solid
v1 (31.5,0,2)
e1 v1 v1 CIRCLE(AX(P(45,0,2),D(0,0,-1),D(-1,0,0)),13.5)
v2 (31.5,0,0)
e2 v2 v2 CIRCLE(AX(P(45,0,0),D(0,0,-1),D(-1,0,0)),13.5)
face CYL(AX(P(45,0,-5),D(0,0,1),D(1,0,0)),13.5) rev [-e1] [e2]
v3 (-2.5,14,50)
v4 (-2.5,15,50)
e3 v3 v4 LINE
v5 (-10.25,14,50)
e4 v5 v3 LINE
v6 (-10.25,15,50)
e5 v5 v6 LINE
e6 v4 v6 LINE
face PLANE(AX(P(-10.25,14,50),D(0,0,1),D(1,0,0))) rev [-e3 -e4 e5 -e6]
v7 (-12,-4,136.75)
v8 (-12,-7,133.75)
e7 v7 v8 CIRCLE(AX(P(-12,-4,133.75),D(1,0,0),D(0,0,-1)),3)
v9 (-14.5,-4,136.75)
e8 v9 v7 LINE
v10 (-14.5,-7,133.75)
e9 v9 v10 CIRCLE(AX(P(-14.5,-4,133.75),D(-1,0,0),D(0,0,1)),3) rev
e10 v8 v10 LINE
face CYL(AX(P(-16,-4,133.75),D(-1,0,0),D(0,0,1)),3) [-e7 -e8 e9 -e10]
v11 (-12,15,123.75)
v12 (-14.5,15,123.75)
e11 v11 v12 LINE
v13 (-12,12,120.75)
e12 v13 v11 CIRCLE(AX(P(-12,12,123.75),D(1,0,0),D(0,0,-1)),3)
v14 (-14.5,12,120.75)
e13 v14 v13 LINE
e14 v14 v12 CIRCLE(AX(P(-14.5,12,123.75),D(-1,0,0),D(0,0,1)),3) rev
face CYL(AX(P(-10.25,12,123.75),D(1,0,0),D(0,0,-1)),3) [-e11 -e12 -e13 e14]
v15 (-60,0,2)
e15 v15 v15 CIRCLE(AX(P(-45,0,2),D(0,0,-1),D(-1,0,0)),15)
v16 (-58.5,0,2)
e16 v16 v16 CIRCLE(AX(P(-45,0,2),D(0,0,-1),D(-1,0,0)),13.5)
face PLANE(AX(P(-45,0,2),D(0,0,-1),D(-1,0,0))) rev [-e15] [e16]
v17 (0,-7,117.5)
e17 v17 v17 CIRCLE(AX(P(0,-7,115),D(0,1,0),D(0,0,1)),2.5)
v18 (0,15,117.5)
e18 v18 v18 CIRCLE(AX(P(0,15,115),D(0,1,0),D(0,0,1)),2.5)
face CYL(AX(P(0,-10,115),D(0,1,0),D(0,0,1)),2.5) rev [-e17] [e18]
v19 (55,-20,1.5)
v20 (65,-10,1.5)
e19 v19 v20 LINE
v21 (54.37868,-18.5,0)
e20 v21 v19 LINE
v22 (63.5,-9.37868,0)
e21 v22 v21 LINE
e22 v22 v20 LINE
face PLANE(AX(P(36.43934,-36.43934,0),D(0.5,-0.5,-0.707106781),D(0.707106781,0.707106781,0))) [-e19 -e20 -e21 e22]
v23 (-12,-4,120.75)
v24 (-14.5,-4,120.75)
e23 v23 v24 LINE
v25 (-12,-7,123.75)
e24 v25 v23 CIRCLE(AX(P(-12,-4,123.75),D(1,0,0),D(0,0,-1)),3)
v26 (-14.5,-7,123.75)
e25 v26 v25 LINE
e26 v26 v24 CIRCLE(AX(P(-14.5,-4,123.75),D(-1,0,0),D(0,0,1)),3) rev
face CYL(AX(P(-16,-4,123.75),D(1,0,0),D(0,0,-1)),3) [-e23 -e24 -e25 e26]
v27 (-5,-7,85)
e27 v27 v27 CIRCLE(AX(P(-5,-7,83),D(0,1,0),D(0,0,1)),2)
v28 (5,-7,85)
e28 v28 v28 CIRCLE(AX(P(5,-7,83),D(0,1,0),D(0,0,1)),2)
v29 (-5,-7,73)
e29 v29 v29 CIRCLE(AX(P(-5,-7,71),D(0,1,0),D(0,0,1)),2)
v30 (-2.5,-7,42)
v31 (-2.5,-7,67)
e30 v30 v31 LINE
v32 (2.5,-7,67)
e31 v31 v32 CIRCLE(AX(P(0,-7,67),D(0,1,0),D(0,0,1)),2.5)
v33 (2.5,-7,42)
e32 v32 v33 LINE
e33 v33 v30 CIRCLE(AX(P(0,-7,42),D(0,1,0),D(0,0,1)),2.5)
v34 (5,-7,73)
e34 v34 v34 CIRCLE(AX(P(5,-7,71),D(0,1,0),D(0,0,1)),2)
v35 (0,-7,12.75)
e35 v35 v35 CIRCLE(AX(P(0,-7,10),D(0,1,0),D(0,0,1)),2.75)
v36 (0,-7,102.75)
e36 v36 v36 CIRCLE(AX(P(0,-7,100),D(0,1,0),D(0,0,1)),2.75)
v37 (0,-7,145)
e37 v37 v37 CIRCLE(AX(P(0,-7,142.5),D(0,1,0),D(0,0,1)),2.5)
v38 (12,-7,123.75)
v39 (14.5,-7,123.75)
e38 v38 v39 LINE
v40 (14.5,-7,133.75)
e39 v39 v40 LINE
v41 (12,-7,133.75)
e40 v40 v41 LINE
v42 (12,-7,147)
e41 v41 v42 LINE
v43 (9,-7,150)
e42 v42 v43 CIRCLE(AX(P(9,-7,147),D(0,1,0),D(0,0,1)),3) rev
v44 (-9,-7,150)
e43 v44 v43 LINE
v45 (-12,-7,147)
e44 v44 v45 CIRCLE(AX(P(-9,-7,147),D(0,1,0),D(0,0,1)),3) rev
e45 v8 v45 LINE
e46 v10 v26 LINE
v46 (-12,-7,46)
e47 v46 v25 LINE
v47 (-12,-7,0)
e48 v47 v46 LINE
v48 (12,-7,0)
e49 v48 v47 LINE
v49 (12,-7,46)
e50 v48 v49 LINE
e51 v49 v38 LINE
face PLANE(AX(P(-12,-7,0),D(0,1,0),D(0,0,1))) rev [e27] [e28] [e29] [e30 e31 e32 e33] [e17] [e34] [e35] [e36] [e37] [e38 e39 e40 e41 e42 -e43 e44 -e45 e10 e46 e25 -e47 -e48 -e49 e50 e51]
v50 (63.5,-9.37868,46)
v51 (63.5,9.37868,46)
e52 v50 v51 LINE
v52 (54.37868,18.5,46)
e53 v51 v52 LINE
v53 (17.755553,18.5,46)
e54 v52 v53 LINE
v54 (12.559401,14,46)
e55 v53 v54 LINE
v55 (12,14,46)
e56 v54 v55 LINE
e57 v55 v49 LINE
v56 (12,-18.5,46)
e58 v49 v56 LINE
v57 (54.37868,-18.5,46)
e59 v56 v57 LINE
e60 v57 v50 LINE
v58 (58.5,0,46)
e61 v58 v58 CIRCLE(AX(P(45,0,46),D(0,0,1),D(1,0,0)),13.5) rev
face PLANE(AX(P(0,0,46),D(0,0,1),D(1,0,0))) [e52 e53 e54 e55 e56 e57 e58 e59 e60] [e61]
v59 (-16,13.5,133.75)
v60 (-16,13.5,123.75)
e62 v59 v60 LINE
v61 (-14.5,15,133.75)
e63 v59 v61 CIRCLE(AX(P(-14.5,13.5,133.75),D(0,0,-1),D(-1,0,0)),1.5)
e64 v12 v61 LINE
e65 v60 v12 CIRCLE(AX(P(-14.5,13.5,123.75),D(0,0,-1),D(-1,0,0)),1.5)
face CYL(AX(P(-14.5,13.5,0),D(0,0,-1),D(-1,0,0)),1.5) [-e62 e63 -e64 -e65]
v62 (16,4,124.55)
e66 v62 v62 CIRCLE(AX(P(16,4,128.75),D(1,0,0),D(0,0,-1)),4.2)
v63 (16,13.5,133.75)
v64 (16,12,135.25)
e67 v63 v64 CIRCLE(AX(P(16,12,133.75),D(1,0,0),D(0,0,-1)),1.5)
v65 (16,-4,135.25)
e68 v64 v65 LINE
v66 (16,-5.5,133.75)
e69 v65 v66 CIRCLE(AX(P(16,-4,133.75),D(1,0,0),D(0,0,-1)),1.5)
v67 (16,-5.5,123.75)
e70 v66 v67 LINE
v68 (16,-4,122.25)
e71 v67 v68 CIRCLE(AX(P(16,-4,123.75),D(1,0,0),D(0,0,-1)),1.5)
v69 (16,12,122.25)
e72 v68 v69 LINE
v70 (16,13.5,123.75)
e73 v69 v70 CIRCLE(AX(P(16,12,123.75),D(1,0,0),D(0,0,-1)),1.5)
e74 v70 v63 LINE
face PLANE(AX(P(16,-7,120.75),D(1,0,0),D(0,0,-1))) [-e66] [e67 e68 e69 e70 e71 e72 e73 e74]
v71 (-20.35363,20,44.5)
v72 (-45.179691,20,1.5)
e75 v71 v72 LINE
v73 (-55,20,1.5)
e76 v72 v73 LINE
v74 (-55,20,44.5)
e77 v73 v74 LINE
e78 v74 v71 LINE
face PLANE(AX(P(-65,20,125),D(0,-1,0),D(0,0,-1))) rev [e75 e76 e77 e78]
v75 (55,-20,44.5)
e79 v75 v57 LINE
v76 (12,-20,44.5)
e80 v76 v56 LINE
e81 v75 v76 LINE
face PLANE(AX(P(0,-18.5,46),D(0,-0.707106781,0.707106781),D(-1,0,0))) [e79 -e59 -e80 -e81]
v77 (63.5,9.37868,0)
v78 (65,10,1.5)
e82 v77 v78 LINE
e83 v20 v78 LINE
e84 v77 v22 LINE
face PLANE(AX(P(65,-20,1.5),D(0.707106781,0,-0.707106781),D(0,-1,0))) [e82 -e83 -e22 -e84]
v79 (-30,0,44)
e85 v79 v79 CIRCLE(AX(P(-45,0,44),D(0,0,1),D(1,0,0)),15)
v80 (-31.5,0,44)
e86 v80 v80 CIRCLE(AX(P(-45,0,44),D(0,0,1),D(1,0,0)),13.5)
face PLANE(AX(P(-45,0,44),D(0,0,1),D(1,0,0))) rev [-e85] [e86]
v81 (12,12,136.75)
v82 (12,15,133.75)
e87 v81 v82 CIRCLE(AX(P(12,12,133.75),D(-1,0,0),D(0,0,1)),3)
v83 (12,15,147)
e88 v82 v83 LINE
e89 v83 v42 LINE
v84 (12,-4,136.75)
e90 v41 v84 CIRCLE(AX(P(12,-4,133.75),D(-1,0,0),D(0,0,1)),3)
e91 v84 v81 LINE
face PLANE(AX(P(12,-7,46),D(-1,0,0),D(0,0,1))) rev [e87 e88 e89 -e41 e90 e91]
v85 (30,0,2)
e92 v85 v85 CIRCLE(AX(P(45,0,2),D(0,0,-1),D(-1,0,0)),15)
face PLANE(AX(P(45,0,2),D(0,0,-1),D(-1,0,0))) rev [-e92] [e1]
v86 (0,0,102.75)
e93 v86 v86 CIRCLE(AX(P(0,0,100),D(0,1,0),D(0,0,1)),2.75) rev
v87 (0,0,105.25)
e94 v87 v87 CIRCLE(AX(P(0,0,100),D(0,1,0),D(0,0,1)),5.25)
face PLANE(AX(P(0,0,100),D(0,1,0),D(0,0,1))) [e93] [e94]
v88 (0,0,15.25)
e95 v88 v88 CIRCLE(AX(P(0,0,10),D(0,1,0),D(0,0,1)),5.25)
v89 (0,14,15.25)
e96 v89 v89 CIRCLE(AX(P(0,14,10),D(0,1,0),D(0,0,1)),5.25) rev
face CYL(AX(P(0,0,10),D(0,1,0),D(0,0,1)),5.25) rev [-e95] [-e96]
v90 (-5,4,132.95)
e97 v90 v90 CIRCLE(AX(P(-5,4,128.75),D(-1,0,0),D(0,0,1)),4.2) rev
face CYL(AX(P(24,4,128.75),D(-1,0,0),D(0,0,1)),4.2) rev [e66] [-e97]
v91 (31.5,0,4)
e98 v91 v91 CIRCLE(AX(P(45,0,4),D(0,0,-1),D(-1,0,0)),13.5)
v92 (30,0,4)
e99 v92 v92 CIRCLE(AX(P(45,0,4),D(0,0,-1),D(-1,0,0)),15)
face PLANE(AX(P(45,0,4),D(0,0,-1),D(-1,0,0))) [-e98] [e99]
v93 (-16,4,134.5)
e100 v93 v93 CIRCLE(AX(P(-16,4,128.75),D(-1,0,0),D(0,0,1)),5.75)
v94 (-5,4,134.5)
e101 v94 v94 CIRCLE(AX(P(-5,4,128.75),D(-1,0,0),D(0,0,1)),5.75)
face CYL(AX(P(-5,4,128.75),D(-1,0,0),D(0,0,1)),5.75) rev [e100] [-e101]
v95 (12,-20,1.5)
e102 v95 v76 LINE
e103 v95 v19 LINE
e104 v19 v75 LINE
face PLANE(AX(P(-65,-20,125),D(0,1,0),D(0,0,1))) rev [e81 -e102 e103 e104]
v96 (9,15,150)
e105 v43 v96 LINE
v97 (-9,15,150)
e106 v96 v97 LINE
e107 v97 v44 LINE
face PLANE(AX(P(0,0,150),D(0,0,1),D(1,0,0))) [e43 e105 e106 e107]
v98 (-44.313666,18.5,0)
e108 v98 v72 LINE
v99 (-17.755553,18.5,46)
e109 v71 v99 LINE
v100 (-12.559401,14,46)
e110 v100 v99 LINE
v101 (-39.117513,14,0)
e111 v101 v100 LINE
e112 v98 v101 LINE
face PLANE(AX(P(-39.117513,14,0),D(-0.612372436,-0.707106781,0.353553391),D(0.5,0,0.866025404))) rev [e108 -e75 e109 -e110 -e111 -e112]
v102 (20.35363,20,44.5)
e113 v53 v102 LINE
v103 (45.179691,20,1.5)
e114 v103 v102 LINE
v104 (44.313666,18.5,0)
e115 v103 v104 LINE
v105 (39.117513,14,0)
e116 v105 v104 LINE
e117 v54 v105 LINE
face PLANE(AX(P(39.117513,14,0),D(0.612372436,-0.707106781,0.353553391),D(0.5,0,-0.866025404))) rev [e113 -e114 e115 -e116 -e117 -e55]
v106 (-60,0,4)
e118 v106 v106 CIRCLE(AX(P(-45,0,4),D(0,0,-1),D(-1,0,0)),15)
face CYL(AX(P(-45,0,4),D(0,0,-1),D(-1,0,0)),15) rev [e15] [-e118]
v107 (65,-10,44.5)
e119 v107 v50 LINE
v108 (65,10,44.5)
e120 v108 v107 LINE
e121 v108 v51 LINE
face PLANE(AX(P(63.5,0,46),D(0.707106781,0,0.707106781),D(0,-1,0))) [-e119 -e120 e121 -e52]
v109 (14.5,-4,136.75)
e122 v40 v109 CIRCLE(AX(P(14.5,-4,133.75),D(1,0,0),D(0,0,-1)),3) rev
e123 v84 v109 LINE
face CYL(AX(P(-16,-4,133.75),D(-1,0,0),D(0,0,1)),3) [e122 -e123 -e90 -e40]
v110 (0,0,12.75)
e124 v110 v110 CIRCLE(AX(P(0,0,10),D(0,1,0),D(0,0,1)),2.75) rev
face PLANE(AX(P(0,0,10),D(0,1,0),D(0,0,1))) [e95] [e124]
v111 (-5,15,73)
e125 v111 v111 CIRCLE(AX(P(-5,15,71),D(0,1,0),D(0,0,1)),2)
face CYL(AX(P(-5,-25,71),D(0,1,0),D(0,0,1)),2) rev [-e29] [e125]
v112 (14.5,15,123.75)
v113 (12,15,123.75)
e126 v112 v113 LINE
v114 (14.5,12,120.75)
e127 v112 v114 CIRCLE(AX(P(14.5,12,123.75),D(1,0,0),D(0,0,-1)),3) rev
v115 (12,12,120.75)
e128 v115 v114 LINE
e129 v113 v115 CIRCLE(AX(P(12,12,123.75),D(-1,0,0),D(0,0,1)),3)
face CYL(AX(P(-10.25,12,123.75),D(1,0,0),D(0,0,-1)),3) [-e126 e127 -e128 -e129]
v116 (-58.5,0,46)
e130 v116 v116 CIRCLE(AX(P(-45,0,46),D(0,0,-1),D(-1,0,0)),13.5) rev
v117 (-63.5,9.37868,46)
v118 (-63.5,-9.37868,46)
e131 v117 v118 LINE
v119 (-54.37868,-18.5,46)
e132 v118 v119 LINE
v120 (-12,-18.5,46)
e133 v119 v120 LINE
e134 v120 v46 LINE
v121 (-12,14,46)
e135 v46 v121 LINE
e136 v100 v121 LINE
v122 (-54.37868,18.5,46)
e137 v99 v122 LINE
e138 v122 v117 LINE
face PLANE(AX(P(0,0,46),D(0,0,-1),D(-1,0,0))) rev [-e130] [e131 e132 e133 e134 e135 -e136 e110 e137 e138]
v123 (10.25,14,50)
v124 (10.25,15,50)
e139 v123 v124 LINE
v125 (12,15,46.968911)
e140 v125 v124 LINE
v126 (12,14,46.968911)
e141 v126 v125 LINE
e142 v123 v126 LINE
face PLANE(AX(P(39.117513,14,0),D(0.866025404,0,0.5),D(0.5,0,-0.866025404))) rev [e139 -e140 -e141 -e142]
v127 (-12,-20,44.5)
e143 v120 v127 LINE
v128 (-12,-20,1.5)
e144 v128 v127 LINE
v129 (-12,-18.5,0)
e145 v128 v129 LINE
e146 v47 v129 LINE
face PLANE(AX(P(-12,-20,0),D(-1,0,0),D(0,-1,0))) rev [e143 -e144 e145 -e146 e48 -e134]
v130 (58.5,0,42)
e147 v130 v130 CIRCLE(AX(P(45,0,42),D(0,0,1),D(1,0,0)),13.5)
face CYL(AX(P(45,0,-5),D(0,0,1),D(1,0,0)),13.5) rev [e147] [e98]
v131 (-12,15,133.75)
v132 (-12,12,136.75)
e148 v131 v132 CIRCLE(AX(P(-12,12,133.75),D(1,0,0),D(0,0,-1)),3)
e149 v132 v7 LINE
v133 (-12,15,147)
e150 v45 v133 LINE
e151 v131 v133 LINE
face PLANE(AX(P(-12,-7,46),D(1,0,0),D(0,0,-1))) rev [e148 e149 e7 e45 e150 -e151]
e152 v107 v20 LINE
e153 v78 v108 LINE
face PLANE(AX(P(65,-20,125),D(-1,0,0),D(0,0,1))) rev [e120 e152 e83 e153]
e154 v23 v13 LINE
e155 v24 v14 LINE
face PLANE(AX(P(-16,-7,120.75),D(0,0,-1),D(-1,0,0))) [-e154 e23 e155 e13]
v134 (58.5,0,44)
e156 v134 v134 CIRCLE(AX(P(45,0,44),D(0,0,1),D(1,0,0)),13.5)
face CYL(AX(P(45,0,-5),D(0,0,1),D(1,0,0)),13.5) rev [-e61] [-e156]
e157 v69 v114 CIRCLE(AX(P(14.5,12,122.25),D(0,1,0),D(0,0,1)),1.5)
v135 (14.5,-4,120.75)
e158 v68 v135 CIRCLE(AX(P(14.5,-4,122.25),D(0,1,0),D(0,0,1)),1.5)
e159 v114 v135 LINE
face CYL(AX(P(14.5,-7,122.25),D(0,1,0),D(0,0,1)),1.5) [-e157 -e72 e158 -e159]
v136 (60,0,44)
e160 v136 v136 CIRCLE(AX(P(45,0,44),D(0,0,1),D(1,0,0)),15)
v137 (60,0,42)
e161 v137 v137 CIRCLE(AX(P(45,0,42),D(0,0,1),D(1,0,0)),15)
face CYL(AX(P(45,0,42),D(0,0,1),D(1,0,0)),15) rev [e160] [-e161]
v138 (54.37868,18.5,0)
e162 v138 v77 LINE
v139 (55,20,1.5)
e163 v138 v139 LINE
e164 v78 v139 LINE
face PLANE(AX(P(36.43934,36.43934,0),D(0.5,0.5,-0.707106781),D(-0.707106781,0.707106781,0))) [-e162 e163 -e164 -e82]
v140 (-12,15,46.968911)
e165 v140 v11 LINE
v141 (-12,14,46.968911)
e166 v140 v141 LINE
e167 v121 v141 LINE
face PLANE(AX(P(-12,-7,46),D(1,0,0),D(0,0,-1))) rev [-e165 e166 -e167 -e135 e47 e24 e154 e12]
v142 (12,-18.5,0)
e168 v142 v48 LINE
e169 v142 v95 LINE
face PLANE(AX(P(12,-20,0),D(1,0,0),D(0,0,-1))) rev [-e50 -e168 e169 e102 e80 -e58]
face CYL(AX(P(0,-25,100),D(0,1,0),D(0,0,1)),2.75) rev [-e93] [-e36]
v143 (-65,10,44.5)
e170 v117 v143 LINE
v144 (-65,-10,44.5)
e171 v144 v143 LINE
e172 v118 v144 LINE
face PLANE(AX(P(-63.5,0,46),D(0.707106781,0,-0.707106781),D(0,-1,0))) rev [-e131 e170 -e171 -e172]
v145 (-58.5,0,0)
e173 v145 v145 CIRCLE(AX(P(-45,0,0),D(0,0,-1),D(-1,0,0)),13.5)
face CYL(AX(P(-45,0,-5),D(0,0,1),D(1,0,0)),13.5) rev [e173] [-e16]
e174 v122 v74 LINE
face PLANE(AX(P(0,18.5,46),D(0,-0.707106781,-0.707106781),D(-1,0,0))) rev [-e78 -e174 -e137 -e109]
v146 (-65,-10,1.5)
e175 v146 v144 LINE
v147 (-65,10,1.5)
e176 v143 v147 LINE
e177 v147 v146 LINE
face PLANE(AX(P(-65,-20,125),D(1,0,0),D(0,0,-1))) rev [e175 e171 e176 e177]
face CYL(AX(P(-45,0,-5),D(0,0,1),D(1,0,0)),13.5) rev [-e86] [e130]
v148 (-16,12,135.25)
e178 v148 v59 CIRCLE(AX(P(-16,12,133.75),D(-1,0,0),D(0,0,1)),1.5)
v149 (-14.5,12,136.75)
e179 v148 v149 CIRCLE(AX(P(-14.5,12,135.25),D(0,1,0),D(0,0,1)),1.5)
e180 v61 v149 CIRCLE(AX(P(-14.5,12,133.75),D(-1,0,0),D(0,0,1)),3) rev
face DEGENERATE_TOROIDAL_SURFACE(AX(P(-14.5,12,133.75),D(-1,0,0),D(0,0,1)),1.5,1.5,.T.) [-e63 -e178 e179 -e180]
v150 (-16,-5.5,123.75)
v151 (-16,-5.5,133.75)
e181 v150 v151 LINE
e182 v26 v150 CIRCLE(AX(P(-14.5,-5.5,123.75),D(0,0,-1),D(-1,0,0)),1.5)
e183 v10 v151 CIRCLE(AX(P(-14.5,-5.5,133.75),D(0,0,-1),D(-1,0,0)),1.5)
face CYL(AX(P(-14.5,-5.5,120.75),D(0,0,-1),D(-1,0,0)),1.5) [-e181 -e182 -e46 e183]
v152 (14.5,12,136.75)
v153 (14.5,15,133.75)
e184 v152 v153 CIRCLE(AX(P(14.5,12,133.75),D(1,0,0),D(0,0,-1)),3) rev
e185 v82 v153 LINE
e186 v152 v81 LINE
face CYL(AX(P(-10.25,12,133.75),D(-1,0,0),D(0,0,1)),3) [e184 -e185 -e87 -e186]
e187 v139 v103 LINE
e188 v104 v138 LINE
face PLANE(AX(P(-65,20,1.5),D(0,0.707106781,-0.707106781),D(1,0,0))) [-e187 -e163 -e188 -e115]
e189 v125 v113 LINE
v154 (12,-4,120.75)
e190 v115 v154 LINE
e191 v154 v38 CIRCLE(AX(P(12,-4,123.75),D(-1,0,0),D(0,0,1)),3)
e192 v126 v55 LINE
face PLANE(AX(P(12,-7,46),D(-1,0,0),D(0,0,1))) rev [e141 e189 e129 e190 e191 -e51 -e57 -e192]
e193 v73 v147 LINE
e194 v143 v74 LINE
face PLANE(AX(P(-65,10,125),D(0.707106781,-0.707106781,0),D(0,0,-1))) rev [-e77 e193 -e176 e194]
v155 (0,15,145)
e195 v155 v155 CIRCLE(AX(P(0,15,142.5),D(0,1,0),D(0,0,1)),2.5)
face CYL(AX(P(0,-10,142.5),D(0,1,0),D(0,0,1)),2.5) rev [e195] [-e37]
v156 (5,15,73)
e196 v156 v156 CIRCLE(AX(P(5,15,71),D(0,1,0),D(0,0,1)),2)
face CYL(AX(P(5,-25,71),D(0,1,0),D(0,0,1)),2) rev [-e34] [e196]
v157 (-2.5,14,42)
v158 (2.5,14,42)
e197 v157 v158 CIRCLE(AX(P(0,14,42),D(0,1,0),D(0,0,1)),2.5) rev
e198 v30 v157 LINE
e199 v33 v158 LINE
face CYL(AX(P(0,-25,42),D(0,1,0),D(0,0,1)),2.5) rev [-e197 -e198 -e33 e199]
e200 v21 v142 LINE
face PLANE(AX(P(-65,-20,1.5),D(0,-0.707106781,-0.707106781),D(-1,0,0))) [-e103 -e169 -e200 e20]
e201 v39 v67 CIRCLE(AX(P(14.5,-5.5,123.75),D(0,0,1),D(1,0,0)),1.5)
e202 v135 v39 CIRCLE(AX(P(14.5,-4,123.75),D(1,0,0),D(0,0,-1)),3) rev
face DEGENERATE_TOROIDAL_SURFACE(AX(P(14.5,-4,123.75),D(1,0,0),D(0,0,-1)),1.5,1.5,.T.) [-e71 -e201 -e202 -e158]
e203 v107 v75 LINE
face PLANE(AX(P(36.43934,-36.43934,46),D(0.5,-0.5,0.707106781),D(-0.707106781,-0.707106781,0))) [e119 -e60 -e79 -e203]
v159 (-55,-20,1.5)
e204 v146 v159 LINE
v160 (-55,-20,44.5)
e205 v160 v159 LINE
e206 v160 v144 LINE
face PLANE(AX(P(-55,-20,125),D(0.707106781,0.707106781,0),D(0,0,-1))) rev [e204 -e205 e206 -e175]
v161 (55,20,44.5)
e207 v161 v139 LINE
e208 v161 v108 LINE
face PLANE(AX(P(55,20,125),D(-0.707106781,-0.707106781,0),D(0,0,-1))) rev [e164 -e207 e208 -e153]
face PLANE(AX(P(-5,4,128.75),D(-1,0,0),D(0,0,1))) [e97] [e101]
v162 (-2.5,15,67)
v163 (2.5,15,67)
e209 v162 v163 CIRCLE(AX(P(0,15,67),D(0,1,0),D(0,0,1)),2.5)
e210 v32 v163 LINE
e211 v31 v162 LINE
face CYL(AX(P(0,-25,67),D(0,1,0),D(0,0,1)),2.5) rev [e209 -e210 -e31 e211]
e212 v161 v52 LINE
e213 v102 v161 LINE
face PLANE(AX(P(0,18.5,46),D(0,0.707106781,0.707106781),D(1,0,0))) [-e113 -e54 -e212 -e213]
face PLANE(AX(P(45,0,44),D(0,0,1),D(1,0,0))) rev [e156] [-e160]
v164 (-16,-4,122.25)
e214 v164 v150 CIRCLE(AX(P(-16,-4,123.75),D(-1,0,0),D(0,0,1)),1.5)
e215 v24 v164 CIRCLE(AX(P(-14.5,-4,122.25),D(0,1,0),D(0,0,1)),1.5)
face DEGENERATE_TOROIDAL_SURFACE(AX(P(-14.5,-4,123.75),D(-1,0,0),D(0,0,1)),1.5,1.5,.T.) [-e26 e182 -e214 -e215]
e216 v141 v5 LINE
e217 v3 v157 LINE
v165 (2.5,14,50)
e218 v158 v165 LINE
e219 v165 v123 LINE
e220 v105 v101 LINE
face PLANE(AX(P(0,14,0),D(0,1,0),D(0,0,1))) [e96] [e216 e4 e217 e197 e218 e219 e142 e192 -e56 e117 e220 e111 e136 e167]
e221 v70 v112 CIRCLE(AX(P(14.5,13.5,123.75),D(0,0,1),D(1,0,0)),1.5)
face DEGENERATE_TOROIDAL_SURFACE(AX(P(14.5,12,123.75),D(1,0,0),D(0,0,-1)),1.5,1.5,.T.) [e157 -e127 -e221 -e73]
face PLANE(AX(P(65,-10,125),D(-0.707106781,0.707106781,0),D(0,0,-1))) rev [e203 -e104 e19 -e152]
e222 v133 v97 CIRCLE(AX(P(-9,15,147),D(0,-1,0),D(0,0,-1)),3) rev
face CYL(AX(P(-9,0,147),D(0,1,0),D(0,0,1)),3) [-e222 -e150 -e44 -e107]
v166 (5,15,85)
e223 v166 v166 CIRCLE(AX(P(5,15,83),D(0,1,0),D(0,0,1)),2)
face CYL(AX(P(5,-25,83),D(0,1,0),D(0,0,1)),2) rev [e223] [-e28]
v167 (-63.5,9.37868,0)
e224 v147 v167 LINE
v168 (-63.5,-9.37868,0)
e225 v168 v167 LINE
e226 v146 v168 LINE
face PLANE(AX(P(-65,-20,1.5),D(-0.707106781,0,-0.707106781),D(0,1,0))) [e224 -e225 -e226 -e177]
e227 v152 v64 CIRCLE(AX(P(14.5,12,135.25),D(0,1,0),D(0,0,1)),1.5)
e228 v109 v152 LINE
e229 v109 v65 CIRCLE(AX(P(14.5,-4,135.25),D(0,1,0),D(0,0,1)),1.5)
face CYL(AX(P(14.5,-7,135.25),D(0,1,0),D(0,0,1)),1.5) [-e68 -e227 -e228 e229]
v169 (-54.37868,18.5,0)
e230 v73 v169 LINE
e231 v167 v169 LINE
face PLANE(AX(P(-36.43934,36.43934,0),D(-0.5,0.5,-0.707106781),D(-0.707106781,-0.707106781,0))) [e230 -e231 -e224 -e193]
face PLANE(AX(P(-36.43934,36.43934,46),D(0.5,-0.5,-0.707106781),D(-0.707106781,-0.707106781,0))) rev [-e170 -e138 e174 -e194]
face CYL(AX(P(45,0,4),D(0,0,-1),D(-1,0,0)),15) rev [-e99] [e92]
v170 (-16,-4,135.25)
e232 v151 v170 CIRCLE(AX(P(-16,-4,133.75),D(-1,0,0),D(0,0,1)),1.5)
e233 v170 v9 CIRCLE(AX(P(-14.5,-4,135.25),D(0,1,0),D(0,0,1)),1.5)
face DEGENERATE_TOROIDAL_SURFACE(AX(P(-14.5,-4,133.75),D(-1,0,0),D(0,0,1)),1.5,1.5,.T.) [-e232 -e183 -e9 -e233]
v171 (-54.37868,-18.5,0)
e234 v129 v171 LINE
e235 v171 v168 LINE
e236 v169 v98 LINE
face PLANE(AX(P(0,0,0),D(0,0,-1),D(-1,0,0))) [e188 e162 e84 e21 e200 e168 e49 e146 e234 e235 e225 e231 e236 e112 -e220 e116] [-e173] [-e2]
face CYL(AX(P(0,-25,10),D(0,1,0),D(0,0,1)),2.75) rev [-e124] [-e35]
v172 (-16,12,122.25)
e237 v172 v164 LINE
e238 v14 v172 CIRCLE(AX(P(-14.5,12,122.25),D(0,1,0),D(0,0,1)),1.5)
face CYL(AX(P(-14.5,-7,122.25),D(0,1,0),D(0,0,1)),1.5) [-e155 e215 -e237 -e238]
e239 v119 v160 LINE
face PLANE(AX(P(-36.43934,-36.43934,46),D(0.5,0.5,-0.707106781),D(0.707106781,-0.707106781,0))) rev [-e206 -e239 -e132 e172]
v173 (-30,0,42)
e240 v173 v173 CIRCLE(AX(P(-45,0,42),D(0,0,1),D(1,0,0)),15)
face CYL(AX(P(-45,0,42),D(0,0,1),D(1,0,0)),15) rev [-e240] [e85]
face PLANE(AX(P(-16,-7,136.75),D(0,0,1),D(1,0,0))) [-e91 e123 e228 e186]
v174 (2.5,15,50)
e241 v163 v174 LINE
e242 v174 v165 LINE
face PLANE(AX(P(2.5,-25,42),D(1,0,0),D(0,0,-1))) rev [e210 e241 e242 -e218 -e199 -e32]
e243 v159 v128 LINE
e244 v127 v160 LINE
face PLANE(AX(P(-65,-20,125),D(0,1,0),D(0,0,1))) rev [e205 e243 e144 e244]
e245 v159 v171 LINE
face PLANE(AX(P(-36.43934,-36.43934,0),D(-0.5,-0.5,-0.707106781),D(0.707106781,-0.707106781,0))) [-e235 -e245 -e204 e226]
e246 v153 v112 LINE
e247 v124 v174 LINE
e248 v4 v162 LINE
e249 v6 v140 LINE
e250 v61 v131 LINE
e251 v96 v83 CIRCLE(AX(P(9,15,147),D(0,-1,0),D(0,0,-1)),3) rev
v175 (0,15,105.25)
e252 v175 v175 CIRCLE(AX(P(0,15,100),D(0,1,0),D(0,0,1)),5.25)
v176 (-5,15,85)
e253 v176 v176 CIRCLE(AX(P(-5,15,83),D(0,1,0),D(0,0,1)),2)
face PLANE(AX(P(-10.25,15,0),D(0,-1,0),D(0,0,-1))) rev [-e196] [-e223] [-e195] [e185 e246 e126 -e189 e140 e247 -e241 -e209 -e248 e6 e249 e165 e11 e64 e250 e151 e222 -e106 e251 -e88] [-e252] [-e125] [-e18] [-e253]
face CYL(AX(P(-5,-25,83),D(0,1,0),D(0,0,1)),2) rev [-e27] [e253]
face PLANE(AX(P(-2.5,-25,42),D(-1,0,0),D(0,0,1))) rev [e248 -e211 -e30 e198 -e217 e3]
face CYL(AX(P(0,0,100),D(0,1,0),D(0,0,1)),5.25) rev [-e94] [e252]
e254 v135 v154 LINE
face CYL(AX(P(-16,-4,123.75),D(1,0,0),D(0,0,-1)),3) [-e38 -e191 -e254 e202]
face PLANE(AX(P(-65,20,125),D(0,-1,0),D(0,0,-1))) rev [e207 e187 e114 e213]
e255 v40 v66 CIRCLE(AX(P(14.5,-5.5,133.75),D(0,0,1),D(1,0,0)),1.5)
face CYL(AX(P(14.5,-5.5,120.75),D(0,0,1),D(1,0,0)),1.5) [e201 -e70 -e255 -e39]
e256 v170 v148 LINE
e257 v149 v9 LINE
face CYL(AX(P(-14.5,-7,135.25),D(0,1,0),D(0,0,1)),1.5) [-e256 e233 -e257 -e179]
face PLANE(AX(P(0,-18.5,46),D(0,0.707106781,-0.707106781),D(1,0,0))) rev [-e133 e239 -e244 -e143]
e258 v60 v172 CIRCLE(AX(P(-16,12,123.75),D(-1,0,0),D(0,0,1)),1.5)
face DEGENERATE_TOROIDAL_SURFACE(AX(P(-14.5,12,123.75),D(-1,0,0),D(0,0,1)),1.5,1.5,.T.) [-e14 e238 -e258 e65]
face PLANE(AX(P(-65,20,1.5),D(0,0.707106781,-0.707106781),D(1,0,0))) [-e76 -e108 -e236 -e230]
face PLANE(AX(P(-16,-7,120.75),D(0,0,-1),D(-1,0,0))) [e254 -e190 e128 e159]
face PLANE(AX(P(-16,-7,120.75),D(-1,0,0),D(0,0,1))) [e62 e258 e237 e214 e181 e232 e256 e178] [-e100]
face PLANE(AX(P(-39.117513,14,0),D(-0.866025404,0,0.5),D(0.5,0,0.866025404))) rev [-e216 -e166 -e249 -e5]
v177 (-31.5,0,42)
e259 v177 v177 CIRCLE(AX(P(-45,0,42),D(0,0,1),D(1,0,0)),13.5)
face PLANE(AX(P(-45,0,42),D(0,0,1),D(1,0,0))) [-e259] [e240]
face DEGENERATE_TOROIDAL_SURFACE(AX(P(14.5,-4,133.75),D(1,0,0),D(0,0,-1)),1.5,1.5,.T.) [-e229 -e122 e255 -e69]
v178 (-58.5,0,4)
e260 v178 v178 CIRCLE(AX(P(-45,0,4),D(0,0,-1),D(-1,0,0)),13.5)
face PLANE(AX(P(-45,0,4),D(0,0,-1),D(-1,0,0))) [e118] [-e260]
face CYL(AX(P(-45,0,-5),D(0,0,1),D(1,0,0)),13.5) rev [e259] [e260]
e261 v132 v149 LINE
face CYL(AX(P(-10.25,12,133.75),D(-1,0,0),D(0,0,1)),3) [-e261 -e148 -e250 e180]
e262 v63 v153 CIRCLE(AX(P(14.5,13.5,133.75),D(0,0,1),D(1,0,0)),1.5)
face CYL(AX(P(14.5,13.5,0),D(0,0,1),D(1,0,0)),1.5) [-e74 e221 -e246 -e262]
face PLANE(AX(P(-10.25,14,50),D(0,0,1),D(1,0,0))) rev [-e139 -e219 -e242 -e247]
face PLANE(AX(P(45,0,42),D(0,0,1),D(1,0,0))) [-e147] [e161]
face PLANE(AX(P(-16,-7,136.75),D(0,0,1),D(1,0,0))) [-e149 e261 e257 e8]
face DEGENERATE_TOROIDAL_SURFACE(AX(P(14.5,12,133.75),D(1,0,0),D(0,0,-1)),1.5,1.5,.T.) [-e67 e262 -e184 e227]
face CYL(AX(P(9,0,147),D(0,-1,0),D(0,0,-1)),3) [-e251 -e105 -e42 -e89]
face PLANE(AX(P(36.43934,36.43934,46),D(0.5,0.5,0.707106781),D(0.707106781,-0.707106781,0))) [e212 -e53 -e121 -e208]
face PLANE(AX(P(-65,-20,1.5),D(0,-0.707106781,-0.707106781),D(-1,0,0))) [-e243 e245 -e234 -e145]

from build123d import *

# Parameters (mm, degrees)
SKETCH1_W           = 130
SKETCH1_H           = 40
BOSS_EXTRUDE1_DEPTH = 125
SKETCH2_R           = 13.5
CUT_EXTRUDE1_DEPTH  = 130
SKETCH3_W           = 24
SKETCH3_H           = 13
CUT_EXTRUDE2_DEPTH  = 125
SKETCH4_W           = 20.5
SKETCH4_H           = 5
CUT_EXTRUDE3_DEPTH  = 125
SKETCH5_R           = 2.75
CUT_EXTRUDE4_DEPTH  = 40
SKETCH6_R           = 2
CUT_EXTRUDE5_DEPTH  = 40
SKETCH7_R           = 5.25
CUT_EXTRUDE6_DEPTH  = 15
CUT_EXTRUDE11_START = -4
SKETCH10_R          = 15
SKETCH10_R_2        = 13.5
CUT_EXTRUDE11_DEPTH = 2
CHAMFER1_SIZE       = 10
CUT_EXTRUDE13_DEPTH = 79
CUT_EXTRUDE14_START = -2
SKETCH13_R          = 15
SKETCH13_R_2        = 13.5
CUT_EXTRUDE14_DEPTH = 2
CUT_EXTRUDE16_DEPTH = 6
CHAMFER2_SIZE       = 6
CHAMFER3_SIZE       = 1.5
CHAMFER4_SIZE       = 1.5
SKETCH16_W          = 24
SKETCH16_H          = 22
BOSS_EXTRUDE2_DEPTH = 25
SKETCH17_R          = 2.5
CUT_EXTRUDE17_DEPTH = 25
FILLET2_R           = 3
SKETCH18_W          = 32
SKETCH18_H          = 16
BOSS_EXTRUDE3_DEPTH = 22
SKETCH19_R          = 4.2
CUT_EXTRUDE18_DEPTH = 40
FILLET3_R           = 3
FILLET4_R           = 1.5
SKETCH20_R          = 5.75
CUT_EXTRUDE19_DEPTH = 11


with BuildPart() as part:
    # Sketch1 → Boss-Extrude1 (new body)
    with BuildSketch(Plane.XY):
        Rectangle(SKETCH1_W, SKETCH1_H)
    extrude(amount=BOSS_EXTRUDE1_DEPTH)

    # Sketch2 → Cut-Extrude1 (cut)
    with BuildSketch(Plane.XY.offset(125)):
        with Locations((-45, 0)):
            Circle(SKETCH2_R)
        with Locations((45, 0)):
            Circle(SKETCH2_R)
    extrude(amount=-CUT_EXTRUDE1_DEPTH, mode=Mode.SUBTRACT)

    # Sketch3 → Cut-Extrude2 (cut)
    with BuildSketch(Plane.XY.offset(125)):
        with Locations((0, -13.5)):
            Rectangle(SKETCH3_W, SKETCH3_H)
    extrude(amount=-CUT_EXTRUDE2_DEPTH, mode=Mode.SUBTRACT)

    # Sketch4 → Cut-Extrude3 (cut)
    with BuildSketch(Plane.XY.offset(125)):
        with Locations((0, 17.5)):
            Rectangle(SKETCH4_W, SKETCH4_H)
    extrude(amount=-CUT_EXTRUDE3_DEPTH, mode=Mode.SUBTRACT)

    # Sketch5 → Cut-Extrude4 (cut)
    with BuildSketch(Plane(origin=(0, 15, 0), x_dir=(1, 0, 0), z_dir=(0, 1, 0))):
        with Locations(Location((0, -10, 0), (0, 0, 270))):
            Circle(SKETCH5_R)
        with Locations(Location((0, -100, 0), (0, 0, 270))):
            Circle(SKETCH5_R)
    extrude(amount=-CUT_EXTRUDE4_DEPTH, mode=Mode.SUBTRACT)

    # Sketch6 → Cut-Extrude5 (cut)
    with BuildSketch(Plane(origin=(0, 15, 0), x_dir=(1, 0, 0), z_dir=(0, 1, 0))):
        with Locations(Location((-5, -71, 0), (0, 0, 270))):
            Circle(SKETCH6_R)
        with Locations(Location((5, -71, 0), (0, 0, 270))):
            Circle(SKETCH6_R)
        with Locations(Location((5, -83, 0), (0, 0, 270))):
            Circle(SKETCH6_R)
        with Locations(Location((-5, -83, 0), (0, 0, 270))):
            Circle(SKETCH6_R)
        with BuildLine():
            Line((2.5, -42), (2.5, -67))
            ThreePointArc((2.5, -67), (0, -69.5), (-2.5, -67))
            Line((-2.5, -67), (-2.5, -42))
            ThreePointArc((-2.5, -42), (0, -39.5), (2.5, -42))
        make_face()
    extrude(amount=-CUT_EXTRUDE5_DEPTH, mode=Mode.SUBTRACT)

    # Sketch7 → Cut-Extrude6 (cut)
    with BuildSketch(Plane(origin=(0, 15, 0), x_dir=(1, 0, 0), z_dir=(0, 1, 0))):
        with Locations(Location((0, -100, 0), (0, 0, 270))):
            Circle(SKETCH7_R)
        with Locations(Location((0, -10, 0), (0, 0, 270))):
            Circle(SKETCH7_R)
    extrude(amount=-CUT_EXTRUDE6_DEPTH, mode=Mode.SUBTRACT)

    # Sketch10 → Cut-Extrude11 (cut)
    # profile 1 of 2: a face of its own
    with BuildSketch(Plane(origin=(0, 0, 0), x_dir=(-1, 0, 0), z_dir=(0, 0, -1)).offset(CUT_EXTRUDE11_START)):
        with Locations((-45, 0)):
            Circle(SKETCH10_R)
        with Locations(Location((-45, 0, 0), (0, 0, 180))):
            Circle(SKETCH10_R_2, mode=Mode.SUBTRACT)
    # profile 2 of 2: a face of its own
    with BuildSketch(Plane(origin=(0, 0, 0), x_dir=(-1, 0, 0), z_dir=(0, 0, -1)).offset(CUT_EXTRUDE11_START)):
        with Locations((45, 0)):
            Circle(SKETCH10_R)
        with Locations(Location((45, 0, 0), (0, 0, 180))):
            Circle(SKETCH10_R_2, mode=Mode.SUBTRACT)
    extrude(amount=CUT_EXTRUDE11_DEPTH, mode=Mode.SUBTRACT)

    # Chamfer1
    chamfer1_edges = [part.edges().sort_by_distance(p)[0] for p in [
        (65, -20, 62.5),
        (-65, -20, 62.5),
        (-65, 20, 62.5),
        (65, 20, 62.5),
    ]]
    chamfer(chamfer1_edges, length=CHAMFER1_SIZE)

    # Sketch12 → Cut-Extrude13 (cut)
    with BuildSketch(Plane.XY.offset(125)):
        Polygon((-12, -7), (-12, 15), (-10.25, 15), (-10.25, 20), (-55, 20), (-65, 10), (-65, -10), (-55, -20), (-12, -20), align=None)
        Polygon((12, -7), (12, 15), (10.25, 15), (10.25, 20), (55, 20), (65, 10), (65, -10), (55, -20), (12, -20), align=None)
    extrude(amount=-CUT_EXTRUDE13_DEPTH, mode=Mode.SUBTRACT)

    # Sketch13 → Cut-Extrude14 (cut)
    # profile 1 of 2: a face of its own
    with BuildSketch(Plane.XY.offset(46).offset(CUT_EXTRUDE14_START)):
        with Locations(Location((-45, 0, 0), (0, 0, 180))):
            Circle(SKETCH13_R)
        with Locations((-45, 0)):
            Circle(SKETCH13_R_2, mode=Mode.SUBTRACT)
    # profile 2 of 2: a face of its own
    with BuildSketch(Plane.XY.offset(46).offset(CUT_EXTRUDE14_START)):
        with Locations(Location((45, 0, 0), (0, 0, 180))):
            Circle(SKETCH13_R)
        with Locations((45, 0)):
            Circle(SKETCH13_R_2, mode=Mode.SUBTRACT)
    extrude(amount=-CUT_EXTRUDE14_DEPTH, mode=Mode.SUBTRACT)

    # Sketch14 → Cut-Extrude16 (cut)
    with BuildSketch(Plane(origin=(0, 20, 0), x_dir=(1, 0, 0), z_dir=(0, 1, 0))):
        Polygon((-10.25, -50), (10.25, -50), (39.117513459, 0), (10.25, 0), (-10.25, 0), (-39.117513459, 0), align=None)
    extrude(amount=-CUT_EXTRUDE16_DEPTH, mode=Mode.SUBTRACT)

    # Chamfer2
    chamfer2_edges = [part.edges().sort_by_distance(p)[0] for p in [
        (-25.838457268, 20, 23),
        (25.838457268, 20, 23),
    ]]
    chamfer(chamfer2_edges, length=CHAMFER2_SIZE - 0.0001)  # a hair under: the kernel refuses the full size

    # Chamfer3
    chamfer3_edges = [part.edges().sort_by_distance(p)[0] for p in [
        (-33.5, -20, 46),
        (-60, -15, 46),
        (-65, 0, 46),
        (-60, 15, 46),
        (37.243744418, 20, 46),
        (60, 15, 46),
        (65, 0, 46),
        (60, -15, 46),
        (33.5, -20, 46),
        (-37.243744418, 20, 46),
    ]]
    chamfer(chamfer3_edges, length=CHAMFER3_SIZE)

    # Chamfer4
    chamfer4_edges = [part.edges().sort_by_distance(p)[0] for p in [
        (65, 0, 0),
        (50.52280061, 20, 0),
        (-33.5, -20, 0),
        (-65, 0, 0),
        (-60, 15, 0),
        (-60, -15, 0),
        (60, 15, 0),
        (60, -15, 0),
        (33.5, -20, 0),
        (-50.52280061, 20, 0),
    ]]
    chamfer(chamfer4_edges, length=CHAMFER4_SIZE)

    # Sketch16 → Boss-Extrude2 (add)
    with BuildSketch(Plane.XY.offset(125)):
        with Locations((0, 4)):
            Rectangle(SKETCH16_W, SKETCH16_H)
    extrude(amount=BOSS_EXTRUDE2_DEPTH)

    # Sketch17 → Cut-Extrude17 (cut)
    with BuildSketch(Plane(origin=(0, 15, 0), x_dir=(1, 0, 0), z_dir=(0, 1, 0))):
        with Locations(Location((0, -142.5, 0), (0, 0, 270))):
            Circle(SKETCH17_R)
        with Locations(Location((0, -115, 0), (0, 0, 270))):
            Circle(SKETCH17_R)
    extrude(amount=-CUT_EXTRUDE17_DEPTH, mode=Mode.SUBTRACT)

    # Fillet2
    fillet2_edges = [part.edges().sort_by_distance(p)[0] for p in [
        (12, 4, 150),
        (-12, 4, 150),
    ]]
    fillet(fillet2_edges, radius=FILLET2_R)

    # Sketch18 → Boss-Extrude3 (add)
    with BuildSketch(Plane(origin=(0, 15, 0), x_dir=(1, 0, 0), z_dir=(0, 1, 0))):
        with Locations((0, -128.75)):
            Rectangle(SKETCH18_W, SKETCH18_H)
    extrude(amount=-BOSS_EXTRUDE3_DEPTH)

    # Sketch19 → Cut-Extrude18 (cut)
    with BuildSketch(Plane.ZY.offset(16)):
        with Locations((128.75, 4)):
            Circle(SKETCH19_R)
    extrude(amount=-CUT_EXTRUDE18_DEPTH, mode=Mode.SUBTRACT)

    # Fillet3
    fillet3_edges = [part.edges().sort_by_distance(p)[0] for p in [
        (-14, -7, 120.75),
        (14, -7, 120.75),
        (-14, -7, 136.75),
        (14, -7, 136.75),
        (-14, 15, 120.75),
        (-14, 15, 136.75),
        (14, 15, 136.75),
        (14, 15, 120.75),
    ]]
    fillet(fillet3_edges, radius=FILLET3_R)

    # Fillet4
    fillet4_edges = [part.edges().sort_by_distance(p)[0] for p in [
        (16, 4, 120.75),
        (-16, -7, 128.75),
        (16, -7, 128.75),
        (16, 15, 128.75),
        (16, 4, 136.75),
        (16, 14.121320344, 121.628679656),
        (16, 14.121320344, 135.871320344),
        (16, -6.121320344, 135.871320344),
        (16, -6.121320344, 121.628679656),
        (-16, 4, 136.75),
        (-16, 15, 128.75),
        (-16, 4, 120.75),
        (-16, 14.121320344, 121.628679656),
        (-16, 14.121320344, 135.871320344),
        (-16, -6.121320344, 121.628679656),
        (-16, -6.121320344, 135.871320344),
    ]]
    fillet(fillet4_edges, radius=FILLET4_R)

    # Sketch20 → Cut-Extrude19 (cut)
    with BuildSketch(Plane.ZY.offset(16)):
        with Locations((128.75, 4)):
            Circle(SKETCH20_R)
    extrude(amount=-CUT_EXTRUDE19_DEPTH, mode=Mode.SUBTRACT)


solid = part.part
